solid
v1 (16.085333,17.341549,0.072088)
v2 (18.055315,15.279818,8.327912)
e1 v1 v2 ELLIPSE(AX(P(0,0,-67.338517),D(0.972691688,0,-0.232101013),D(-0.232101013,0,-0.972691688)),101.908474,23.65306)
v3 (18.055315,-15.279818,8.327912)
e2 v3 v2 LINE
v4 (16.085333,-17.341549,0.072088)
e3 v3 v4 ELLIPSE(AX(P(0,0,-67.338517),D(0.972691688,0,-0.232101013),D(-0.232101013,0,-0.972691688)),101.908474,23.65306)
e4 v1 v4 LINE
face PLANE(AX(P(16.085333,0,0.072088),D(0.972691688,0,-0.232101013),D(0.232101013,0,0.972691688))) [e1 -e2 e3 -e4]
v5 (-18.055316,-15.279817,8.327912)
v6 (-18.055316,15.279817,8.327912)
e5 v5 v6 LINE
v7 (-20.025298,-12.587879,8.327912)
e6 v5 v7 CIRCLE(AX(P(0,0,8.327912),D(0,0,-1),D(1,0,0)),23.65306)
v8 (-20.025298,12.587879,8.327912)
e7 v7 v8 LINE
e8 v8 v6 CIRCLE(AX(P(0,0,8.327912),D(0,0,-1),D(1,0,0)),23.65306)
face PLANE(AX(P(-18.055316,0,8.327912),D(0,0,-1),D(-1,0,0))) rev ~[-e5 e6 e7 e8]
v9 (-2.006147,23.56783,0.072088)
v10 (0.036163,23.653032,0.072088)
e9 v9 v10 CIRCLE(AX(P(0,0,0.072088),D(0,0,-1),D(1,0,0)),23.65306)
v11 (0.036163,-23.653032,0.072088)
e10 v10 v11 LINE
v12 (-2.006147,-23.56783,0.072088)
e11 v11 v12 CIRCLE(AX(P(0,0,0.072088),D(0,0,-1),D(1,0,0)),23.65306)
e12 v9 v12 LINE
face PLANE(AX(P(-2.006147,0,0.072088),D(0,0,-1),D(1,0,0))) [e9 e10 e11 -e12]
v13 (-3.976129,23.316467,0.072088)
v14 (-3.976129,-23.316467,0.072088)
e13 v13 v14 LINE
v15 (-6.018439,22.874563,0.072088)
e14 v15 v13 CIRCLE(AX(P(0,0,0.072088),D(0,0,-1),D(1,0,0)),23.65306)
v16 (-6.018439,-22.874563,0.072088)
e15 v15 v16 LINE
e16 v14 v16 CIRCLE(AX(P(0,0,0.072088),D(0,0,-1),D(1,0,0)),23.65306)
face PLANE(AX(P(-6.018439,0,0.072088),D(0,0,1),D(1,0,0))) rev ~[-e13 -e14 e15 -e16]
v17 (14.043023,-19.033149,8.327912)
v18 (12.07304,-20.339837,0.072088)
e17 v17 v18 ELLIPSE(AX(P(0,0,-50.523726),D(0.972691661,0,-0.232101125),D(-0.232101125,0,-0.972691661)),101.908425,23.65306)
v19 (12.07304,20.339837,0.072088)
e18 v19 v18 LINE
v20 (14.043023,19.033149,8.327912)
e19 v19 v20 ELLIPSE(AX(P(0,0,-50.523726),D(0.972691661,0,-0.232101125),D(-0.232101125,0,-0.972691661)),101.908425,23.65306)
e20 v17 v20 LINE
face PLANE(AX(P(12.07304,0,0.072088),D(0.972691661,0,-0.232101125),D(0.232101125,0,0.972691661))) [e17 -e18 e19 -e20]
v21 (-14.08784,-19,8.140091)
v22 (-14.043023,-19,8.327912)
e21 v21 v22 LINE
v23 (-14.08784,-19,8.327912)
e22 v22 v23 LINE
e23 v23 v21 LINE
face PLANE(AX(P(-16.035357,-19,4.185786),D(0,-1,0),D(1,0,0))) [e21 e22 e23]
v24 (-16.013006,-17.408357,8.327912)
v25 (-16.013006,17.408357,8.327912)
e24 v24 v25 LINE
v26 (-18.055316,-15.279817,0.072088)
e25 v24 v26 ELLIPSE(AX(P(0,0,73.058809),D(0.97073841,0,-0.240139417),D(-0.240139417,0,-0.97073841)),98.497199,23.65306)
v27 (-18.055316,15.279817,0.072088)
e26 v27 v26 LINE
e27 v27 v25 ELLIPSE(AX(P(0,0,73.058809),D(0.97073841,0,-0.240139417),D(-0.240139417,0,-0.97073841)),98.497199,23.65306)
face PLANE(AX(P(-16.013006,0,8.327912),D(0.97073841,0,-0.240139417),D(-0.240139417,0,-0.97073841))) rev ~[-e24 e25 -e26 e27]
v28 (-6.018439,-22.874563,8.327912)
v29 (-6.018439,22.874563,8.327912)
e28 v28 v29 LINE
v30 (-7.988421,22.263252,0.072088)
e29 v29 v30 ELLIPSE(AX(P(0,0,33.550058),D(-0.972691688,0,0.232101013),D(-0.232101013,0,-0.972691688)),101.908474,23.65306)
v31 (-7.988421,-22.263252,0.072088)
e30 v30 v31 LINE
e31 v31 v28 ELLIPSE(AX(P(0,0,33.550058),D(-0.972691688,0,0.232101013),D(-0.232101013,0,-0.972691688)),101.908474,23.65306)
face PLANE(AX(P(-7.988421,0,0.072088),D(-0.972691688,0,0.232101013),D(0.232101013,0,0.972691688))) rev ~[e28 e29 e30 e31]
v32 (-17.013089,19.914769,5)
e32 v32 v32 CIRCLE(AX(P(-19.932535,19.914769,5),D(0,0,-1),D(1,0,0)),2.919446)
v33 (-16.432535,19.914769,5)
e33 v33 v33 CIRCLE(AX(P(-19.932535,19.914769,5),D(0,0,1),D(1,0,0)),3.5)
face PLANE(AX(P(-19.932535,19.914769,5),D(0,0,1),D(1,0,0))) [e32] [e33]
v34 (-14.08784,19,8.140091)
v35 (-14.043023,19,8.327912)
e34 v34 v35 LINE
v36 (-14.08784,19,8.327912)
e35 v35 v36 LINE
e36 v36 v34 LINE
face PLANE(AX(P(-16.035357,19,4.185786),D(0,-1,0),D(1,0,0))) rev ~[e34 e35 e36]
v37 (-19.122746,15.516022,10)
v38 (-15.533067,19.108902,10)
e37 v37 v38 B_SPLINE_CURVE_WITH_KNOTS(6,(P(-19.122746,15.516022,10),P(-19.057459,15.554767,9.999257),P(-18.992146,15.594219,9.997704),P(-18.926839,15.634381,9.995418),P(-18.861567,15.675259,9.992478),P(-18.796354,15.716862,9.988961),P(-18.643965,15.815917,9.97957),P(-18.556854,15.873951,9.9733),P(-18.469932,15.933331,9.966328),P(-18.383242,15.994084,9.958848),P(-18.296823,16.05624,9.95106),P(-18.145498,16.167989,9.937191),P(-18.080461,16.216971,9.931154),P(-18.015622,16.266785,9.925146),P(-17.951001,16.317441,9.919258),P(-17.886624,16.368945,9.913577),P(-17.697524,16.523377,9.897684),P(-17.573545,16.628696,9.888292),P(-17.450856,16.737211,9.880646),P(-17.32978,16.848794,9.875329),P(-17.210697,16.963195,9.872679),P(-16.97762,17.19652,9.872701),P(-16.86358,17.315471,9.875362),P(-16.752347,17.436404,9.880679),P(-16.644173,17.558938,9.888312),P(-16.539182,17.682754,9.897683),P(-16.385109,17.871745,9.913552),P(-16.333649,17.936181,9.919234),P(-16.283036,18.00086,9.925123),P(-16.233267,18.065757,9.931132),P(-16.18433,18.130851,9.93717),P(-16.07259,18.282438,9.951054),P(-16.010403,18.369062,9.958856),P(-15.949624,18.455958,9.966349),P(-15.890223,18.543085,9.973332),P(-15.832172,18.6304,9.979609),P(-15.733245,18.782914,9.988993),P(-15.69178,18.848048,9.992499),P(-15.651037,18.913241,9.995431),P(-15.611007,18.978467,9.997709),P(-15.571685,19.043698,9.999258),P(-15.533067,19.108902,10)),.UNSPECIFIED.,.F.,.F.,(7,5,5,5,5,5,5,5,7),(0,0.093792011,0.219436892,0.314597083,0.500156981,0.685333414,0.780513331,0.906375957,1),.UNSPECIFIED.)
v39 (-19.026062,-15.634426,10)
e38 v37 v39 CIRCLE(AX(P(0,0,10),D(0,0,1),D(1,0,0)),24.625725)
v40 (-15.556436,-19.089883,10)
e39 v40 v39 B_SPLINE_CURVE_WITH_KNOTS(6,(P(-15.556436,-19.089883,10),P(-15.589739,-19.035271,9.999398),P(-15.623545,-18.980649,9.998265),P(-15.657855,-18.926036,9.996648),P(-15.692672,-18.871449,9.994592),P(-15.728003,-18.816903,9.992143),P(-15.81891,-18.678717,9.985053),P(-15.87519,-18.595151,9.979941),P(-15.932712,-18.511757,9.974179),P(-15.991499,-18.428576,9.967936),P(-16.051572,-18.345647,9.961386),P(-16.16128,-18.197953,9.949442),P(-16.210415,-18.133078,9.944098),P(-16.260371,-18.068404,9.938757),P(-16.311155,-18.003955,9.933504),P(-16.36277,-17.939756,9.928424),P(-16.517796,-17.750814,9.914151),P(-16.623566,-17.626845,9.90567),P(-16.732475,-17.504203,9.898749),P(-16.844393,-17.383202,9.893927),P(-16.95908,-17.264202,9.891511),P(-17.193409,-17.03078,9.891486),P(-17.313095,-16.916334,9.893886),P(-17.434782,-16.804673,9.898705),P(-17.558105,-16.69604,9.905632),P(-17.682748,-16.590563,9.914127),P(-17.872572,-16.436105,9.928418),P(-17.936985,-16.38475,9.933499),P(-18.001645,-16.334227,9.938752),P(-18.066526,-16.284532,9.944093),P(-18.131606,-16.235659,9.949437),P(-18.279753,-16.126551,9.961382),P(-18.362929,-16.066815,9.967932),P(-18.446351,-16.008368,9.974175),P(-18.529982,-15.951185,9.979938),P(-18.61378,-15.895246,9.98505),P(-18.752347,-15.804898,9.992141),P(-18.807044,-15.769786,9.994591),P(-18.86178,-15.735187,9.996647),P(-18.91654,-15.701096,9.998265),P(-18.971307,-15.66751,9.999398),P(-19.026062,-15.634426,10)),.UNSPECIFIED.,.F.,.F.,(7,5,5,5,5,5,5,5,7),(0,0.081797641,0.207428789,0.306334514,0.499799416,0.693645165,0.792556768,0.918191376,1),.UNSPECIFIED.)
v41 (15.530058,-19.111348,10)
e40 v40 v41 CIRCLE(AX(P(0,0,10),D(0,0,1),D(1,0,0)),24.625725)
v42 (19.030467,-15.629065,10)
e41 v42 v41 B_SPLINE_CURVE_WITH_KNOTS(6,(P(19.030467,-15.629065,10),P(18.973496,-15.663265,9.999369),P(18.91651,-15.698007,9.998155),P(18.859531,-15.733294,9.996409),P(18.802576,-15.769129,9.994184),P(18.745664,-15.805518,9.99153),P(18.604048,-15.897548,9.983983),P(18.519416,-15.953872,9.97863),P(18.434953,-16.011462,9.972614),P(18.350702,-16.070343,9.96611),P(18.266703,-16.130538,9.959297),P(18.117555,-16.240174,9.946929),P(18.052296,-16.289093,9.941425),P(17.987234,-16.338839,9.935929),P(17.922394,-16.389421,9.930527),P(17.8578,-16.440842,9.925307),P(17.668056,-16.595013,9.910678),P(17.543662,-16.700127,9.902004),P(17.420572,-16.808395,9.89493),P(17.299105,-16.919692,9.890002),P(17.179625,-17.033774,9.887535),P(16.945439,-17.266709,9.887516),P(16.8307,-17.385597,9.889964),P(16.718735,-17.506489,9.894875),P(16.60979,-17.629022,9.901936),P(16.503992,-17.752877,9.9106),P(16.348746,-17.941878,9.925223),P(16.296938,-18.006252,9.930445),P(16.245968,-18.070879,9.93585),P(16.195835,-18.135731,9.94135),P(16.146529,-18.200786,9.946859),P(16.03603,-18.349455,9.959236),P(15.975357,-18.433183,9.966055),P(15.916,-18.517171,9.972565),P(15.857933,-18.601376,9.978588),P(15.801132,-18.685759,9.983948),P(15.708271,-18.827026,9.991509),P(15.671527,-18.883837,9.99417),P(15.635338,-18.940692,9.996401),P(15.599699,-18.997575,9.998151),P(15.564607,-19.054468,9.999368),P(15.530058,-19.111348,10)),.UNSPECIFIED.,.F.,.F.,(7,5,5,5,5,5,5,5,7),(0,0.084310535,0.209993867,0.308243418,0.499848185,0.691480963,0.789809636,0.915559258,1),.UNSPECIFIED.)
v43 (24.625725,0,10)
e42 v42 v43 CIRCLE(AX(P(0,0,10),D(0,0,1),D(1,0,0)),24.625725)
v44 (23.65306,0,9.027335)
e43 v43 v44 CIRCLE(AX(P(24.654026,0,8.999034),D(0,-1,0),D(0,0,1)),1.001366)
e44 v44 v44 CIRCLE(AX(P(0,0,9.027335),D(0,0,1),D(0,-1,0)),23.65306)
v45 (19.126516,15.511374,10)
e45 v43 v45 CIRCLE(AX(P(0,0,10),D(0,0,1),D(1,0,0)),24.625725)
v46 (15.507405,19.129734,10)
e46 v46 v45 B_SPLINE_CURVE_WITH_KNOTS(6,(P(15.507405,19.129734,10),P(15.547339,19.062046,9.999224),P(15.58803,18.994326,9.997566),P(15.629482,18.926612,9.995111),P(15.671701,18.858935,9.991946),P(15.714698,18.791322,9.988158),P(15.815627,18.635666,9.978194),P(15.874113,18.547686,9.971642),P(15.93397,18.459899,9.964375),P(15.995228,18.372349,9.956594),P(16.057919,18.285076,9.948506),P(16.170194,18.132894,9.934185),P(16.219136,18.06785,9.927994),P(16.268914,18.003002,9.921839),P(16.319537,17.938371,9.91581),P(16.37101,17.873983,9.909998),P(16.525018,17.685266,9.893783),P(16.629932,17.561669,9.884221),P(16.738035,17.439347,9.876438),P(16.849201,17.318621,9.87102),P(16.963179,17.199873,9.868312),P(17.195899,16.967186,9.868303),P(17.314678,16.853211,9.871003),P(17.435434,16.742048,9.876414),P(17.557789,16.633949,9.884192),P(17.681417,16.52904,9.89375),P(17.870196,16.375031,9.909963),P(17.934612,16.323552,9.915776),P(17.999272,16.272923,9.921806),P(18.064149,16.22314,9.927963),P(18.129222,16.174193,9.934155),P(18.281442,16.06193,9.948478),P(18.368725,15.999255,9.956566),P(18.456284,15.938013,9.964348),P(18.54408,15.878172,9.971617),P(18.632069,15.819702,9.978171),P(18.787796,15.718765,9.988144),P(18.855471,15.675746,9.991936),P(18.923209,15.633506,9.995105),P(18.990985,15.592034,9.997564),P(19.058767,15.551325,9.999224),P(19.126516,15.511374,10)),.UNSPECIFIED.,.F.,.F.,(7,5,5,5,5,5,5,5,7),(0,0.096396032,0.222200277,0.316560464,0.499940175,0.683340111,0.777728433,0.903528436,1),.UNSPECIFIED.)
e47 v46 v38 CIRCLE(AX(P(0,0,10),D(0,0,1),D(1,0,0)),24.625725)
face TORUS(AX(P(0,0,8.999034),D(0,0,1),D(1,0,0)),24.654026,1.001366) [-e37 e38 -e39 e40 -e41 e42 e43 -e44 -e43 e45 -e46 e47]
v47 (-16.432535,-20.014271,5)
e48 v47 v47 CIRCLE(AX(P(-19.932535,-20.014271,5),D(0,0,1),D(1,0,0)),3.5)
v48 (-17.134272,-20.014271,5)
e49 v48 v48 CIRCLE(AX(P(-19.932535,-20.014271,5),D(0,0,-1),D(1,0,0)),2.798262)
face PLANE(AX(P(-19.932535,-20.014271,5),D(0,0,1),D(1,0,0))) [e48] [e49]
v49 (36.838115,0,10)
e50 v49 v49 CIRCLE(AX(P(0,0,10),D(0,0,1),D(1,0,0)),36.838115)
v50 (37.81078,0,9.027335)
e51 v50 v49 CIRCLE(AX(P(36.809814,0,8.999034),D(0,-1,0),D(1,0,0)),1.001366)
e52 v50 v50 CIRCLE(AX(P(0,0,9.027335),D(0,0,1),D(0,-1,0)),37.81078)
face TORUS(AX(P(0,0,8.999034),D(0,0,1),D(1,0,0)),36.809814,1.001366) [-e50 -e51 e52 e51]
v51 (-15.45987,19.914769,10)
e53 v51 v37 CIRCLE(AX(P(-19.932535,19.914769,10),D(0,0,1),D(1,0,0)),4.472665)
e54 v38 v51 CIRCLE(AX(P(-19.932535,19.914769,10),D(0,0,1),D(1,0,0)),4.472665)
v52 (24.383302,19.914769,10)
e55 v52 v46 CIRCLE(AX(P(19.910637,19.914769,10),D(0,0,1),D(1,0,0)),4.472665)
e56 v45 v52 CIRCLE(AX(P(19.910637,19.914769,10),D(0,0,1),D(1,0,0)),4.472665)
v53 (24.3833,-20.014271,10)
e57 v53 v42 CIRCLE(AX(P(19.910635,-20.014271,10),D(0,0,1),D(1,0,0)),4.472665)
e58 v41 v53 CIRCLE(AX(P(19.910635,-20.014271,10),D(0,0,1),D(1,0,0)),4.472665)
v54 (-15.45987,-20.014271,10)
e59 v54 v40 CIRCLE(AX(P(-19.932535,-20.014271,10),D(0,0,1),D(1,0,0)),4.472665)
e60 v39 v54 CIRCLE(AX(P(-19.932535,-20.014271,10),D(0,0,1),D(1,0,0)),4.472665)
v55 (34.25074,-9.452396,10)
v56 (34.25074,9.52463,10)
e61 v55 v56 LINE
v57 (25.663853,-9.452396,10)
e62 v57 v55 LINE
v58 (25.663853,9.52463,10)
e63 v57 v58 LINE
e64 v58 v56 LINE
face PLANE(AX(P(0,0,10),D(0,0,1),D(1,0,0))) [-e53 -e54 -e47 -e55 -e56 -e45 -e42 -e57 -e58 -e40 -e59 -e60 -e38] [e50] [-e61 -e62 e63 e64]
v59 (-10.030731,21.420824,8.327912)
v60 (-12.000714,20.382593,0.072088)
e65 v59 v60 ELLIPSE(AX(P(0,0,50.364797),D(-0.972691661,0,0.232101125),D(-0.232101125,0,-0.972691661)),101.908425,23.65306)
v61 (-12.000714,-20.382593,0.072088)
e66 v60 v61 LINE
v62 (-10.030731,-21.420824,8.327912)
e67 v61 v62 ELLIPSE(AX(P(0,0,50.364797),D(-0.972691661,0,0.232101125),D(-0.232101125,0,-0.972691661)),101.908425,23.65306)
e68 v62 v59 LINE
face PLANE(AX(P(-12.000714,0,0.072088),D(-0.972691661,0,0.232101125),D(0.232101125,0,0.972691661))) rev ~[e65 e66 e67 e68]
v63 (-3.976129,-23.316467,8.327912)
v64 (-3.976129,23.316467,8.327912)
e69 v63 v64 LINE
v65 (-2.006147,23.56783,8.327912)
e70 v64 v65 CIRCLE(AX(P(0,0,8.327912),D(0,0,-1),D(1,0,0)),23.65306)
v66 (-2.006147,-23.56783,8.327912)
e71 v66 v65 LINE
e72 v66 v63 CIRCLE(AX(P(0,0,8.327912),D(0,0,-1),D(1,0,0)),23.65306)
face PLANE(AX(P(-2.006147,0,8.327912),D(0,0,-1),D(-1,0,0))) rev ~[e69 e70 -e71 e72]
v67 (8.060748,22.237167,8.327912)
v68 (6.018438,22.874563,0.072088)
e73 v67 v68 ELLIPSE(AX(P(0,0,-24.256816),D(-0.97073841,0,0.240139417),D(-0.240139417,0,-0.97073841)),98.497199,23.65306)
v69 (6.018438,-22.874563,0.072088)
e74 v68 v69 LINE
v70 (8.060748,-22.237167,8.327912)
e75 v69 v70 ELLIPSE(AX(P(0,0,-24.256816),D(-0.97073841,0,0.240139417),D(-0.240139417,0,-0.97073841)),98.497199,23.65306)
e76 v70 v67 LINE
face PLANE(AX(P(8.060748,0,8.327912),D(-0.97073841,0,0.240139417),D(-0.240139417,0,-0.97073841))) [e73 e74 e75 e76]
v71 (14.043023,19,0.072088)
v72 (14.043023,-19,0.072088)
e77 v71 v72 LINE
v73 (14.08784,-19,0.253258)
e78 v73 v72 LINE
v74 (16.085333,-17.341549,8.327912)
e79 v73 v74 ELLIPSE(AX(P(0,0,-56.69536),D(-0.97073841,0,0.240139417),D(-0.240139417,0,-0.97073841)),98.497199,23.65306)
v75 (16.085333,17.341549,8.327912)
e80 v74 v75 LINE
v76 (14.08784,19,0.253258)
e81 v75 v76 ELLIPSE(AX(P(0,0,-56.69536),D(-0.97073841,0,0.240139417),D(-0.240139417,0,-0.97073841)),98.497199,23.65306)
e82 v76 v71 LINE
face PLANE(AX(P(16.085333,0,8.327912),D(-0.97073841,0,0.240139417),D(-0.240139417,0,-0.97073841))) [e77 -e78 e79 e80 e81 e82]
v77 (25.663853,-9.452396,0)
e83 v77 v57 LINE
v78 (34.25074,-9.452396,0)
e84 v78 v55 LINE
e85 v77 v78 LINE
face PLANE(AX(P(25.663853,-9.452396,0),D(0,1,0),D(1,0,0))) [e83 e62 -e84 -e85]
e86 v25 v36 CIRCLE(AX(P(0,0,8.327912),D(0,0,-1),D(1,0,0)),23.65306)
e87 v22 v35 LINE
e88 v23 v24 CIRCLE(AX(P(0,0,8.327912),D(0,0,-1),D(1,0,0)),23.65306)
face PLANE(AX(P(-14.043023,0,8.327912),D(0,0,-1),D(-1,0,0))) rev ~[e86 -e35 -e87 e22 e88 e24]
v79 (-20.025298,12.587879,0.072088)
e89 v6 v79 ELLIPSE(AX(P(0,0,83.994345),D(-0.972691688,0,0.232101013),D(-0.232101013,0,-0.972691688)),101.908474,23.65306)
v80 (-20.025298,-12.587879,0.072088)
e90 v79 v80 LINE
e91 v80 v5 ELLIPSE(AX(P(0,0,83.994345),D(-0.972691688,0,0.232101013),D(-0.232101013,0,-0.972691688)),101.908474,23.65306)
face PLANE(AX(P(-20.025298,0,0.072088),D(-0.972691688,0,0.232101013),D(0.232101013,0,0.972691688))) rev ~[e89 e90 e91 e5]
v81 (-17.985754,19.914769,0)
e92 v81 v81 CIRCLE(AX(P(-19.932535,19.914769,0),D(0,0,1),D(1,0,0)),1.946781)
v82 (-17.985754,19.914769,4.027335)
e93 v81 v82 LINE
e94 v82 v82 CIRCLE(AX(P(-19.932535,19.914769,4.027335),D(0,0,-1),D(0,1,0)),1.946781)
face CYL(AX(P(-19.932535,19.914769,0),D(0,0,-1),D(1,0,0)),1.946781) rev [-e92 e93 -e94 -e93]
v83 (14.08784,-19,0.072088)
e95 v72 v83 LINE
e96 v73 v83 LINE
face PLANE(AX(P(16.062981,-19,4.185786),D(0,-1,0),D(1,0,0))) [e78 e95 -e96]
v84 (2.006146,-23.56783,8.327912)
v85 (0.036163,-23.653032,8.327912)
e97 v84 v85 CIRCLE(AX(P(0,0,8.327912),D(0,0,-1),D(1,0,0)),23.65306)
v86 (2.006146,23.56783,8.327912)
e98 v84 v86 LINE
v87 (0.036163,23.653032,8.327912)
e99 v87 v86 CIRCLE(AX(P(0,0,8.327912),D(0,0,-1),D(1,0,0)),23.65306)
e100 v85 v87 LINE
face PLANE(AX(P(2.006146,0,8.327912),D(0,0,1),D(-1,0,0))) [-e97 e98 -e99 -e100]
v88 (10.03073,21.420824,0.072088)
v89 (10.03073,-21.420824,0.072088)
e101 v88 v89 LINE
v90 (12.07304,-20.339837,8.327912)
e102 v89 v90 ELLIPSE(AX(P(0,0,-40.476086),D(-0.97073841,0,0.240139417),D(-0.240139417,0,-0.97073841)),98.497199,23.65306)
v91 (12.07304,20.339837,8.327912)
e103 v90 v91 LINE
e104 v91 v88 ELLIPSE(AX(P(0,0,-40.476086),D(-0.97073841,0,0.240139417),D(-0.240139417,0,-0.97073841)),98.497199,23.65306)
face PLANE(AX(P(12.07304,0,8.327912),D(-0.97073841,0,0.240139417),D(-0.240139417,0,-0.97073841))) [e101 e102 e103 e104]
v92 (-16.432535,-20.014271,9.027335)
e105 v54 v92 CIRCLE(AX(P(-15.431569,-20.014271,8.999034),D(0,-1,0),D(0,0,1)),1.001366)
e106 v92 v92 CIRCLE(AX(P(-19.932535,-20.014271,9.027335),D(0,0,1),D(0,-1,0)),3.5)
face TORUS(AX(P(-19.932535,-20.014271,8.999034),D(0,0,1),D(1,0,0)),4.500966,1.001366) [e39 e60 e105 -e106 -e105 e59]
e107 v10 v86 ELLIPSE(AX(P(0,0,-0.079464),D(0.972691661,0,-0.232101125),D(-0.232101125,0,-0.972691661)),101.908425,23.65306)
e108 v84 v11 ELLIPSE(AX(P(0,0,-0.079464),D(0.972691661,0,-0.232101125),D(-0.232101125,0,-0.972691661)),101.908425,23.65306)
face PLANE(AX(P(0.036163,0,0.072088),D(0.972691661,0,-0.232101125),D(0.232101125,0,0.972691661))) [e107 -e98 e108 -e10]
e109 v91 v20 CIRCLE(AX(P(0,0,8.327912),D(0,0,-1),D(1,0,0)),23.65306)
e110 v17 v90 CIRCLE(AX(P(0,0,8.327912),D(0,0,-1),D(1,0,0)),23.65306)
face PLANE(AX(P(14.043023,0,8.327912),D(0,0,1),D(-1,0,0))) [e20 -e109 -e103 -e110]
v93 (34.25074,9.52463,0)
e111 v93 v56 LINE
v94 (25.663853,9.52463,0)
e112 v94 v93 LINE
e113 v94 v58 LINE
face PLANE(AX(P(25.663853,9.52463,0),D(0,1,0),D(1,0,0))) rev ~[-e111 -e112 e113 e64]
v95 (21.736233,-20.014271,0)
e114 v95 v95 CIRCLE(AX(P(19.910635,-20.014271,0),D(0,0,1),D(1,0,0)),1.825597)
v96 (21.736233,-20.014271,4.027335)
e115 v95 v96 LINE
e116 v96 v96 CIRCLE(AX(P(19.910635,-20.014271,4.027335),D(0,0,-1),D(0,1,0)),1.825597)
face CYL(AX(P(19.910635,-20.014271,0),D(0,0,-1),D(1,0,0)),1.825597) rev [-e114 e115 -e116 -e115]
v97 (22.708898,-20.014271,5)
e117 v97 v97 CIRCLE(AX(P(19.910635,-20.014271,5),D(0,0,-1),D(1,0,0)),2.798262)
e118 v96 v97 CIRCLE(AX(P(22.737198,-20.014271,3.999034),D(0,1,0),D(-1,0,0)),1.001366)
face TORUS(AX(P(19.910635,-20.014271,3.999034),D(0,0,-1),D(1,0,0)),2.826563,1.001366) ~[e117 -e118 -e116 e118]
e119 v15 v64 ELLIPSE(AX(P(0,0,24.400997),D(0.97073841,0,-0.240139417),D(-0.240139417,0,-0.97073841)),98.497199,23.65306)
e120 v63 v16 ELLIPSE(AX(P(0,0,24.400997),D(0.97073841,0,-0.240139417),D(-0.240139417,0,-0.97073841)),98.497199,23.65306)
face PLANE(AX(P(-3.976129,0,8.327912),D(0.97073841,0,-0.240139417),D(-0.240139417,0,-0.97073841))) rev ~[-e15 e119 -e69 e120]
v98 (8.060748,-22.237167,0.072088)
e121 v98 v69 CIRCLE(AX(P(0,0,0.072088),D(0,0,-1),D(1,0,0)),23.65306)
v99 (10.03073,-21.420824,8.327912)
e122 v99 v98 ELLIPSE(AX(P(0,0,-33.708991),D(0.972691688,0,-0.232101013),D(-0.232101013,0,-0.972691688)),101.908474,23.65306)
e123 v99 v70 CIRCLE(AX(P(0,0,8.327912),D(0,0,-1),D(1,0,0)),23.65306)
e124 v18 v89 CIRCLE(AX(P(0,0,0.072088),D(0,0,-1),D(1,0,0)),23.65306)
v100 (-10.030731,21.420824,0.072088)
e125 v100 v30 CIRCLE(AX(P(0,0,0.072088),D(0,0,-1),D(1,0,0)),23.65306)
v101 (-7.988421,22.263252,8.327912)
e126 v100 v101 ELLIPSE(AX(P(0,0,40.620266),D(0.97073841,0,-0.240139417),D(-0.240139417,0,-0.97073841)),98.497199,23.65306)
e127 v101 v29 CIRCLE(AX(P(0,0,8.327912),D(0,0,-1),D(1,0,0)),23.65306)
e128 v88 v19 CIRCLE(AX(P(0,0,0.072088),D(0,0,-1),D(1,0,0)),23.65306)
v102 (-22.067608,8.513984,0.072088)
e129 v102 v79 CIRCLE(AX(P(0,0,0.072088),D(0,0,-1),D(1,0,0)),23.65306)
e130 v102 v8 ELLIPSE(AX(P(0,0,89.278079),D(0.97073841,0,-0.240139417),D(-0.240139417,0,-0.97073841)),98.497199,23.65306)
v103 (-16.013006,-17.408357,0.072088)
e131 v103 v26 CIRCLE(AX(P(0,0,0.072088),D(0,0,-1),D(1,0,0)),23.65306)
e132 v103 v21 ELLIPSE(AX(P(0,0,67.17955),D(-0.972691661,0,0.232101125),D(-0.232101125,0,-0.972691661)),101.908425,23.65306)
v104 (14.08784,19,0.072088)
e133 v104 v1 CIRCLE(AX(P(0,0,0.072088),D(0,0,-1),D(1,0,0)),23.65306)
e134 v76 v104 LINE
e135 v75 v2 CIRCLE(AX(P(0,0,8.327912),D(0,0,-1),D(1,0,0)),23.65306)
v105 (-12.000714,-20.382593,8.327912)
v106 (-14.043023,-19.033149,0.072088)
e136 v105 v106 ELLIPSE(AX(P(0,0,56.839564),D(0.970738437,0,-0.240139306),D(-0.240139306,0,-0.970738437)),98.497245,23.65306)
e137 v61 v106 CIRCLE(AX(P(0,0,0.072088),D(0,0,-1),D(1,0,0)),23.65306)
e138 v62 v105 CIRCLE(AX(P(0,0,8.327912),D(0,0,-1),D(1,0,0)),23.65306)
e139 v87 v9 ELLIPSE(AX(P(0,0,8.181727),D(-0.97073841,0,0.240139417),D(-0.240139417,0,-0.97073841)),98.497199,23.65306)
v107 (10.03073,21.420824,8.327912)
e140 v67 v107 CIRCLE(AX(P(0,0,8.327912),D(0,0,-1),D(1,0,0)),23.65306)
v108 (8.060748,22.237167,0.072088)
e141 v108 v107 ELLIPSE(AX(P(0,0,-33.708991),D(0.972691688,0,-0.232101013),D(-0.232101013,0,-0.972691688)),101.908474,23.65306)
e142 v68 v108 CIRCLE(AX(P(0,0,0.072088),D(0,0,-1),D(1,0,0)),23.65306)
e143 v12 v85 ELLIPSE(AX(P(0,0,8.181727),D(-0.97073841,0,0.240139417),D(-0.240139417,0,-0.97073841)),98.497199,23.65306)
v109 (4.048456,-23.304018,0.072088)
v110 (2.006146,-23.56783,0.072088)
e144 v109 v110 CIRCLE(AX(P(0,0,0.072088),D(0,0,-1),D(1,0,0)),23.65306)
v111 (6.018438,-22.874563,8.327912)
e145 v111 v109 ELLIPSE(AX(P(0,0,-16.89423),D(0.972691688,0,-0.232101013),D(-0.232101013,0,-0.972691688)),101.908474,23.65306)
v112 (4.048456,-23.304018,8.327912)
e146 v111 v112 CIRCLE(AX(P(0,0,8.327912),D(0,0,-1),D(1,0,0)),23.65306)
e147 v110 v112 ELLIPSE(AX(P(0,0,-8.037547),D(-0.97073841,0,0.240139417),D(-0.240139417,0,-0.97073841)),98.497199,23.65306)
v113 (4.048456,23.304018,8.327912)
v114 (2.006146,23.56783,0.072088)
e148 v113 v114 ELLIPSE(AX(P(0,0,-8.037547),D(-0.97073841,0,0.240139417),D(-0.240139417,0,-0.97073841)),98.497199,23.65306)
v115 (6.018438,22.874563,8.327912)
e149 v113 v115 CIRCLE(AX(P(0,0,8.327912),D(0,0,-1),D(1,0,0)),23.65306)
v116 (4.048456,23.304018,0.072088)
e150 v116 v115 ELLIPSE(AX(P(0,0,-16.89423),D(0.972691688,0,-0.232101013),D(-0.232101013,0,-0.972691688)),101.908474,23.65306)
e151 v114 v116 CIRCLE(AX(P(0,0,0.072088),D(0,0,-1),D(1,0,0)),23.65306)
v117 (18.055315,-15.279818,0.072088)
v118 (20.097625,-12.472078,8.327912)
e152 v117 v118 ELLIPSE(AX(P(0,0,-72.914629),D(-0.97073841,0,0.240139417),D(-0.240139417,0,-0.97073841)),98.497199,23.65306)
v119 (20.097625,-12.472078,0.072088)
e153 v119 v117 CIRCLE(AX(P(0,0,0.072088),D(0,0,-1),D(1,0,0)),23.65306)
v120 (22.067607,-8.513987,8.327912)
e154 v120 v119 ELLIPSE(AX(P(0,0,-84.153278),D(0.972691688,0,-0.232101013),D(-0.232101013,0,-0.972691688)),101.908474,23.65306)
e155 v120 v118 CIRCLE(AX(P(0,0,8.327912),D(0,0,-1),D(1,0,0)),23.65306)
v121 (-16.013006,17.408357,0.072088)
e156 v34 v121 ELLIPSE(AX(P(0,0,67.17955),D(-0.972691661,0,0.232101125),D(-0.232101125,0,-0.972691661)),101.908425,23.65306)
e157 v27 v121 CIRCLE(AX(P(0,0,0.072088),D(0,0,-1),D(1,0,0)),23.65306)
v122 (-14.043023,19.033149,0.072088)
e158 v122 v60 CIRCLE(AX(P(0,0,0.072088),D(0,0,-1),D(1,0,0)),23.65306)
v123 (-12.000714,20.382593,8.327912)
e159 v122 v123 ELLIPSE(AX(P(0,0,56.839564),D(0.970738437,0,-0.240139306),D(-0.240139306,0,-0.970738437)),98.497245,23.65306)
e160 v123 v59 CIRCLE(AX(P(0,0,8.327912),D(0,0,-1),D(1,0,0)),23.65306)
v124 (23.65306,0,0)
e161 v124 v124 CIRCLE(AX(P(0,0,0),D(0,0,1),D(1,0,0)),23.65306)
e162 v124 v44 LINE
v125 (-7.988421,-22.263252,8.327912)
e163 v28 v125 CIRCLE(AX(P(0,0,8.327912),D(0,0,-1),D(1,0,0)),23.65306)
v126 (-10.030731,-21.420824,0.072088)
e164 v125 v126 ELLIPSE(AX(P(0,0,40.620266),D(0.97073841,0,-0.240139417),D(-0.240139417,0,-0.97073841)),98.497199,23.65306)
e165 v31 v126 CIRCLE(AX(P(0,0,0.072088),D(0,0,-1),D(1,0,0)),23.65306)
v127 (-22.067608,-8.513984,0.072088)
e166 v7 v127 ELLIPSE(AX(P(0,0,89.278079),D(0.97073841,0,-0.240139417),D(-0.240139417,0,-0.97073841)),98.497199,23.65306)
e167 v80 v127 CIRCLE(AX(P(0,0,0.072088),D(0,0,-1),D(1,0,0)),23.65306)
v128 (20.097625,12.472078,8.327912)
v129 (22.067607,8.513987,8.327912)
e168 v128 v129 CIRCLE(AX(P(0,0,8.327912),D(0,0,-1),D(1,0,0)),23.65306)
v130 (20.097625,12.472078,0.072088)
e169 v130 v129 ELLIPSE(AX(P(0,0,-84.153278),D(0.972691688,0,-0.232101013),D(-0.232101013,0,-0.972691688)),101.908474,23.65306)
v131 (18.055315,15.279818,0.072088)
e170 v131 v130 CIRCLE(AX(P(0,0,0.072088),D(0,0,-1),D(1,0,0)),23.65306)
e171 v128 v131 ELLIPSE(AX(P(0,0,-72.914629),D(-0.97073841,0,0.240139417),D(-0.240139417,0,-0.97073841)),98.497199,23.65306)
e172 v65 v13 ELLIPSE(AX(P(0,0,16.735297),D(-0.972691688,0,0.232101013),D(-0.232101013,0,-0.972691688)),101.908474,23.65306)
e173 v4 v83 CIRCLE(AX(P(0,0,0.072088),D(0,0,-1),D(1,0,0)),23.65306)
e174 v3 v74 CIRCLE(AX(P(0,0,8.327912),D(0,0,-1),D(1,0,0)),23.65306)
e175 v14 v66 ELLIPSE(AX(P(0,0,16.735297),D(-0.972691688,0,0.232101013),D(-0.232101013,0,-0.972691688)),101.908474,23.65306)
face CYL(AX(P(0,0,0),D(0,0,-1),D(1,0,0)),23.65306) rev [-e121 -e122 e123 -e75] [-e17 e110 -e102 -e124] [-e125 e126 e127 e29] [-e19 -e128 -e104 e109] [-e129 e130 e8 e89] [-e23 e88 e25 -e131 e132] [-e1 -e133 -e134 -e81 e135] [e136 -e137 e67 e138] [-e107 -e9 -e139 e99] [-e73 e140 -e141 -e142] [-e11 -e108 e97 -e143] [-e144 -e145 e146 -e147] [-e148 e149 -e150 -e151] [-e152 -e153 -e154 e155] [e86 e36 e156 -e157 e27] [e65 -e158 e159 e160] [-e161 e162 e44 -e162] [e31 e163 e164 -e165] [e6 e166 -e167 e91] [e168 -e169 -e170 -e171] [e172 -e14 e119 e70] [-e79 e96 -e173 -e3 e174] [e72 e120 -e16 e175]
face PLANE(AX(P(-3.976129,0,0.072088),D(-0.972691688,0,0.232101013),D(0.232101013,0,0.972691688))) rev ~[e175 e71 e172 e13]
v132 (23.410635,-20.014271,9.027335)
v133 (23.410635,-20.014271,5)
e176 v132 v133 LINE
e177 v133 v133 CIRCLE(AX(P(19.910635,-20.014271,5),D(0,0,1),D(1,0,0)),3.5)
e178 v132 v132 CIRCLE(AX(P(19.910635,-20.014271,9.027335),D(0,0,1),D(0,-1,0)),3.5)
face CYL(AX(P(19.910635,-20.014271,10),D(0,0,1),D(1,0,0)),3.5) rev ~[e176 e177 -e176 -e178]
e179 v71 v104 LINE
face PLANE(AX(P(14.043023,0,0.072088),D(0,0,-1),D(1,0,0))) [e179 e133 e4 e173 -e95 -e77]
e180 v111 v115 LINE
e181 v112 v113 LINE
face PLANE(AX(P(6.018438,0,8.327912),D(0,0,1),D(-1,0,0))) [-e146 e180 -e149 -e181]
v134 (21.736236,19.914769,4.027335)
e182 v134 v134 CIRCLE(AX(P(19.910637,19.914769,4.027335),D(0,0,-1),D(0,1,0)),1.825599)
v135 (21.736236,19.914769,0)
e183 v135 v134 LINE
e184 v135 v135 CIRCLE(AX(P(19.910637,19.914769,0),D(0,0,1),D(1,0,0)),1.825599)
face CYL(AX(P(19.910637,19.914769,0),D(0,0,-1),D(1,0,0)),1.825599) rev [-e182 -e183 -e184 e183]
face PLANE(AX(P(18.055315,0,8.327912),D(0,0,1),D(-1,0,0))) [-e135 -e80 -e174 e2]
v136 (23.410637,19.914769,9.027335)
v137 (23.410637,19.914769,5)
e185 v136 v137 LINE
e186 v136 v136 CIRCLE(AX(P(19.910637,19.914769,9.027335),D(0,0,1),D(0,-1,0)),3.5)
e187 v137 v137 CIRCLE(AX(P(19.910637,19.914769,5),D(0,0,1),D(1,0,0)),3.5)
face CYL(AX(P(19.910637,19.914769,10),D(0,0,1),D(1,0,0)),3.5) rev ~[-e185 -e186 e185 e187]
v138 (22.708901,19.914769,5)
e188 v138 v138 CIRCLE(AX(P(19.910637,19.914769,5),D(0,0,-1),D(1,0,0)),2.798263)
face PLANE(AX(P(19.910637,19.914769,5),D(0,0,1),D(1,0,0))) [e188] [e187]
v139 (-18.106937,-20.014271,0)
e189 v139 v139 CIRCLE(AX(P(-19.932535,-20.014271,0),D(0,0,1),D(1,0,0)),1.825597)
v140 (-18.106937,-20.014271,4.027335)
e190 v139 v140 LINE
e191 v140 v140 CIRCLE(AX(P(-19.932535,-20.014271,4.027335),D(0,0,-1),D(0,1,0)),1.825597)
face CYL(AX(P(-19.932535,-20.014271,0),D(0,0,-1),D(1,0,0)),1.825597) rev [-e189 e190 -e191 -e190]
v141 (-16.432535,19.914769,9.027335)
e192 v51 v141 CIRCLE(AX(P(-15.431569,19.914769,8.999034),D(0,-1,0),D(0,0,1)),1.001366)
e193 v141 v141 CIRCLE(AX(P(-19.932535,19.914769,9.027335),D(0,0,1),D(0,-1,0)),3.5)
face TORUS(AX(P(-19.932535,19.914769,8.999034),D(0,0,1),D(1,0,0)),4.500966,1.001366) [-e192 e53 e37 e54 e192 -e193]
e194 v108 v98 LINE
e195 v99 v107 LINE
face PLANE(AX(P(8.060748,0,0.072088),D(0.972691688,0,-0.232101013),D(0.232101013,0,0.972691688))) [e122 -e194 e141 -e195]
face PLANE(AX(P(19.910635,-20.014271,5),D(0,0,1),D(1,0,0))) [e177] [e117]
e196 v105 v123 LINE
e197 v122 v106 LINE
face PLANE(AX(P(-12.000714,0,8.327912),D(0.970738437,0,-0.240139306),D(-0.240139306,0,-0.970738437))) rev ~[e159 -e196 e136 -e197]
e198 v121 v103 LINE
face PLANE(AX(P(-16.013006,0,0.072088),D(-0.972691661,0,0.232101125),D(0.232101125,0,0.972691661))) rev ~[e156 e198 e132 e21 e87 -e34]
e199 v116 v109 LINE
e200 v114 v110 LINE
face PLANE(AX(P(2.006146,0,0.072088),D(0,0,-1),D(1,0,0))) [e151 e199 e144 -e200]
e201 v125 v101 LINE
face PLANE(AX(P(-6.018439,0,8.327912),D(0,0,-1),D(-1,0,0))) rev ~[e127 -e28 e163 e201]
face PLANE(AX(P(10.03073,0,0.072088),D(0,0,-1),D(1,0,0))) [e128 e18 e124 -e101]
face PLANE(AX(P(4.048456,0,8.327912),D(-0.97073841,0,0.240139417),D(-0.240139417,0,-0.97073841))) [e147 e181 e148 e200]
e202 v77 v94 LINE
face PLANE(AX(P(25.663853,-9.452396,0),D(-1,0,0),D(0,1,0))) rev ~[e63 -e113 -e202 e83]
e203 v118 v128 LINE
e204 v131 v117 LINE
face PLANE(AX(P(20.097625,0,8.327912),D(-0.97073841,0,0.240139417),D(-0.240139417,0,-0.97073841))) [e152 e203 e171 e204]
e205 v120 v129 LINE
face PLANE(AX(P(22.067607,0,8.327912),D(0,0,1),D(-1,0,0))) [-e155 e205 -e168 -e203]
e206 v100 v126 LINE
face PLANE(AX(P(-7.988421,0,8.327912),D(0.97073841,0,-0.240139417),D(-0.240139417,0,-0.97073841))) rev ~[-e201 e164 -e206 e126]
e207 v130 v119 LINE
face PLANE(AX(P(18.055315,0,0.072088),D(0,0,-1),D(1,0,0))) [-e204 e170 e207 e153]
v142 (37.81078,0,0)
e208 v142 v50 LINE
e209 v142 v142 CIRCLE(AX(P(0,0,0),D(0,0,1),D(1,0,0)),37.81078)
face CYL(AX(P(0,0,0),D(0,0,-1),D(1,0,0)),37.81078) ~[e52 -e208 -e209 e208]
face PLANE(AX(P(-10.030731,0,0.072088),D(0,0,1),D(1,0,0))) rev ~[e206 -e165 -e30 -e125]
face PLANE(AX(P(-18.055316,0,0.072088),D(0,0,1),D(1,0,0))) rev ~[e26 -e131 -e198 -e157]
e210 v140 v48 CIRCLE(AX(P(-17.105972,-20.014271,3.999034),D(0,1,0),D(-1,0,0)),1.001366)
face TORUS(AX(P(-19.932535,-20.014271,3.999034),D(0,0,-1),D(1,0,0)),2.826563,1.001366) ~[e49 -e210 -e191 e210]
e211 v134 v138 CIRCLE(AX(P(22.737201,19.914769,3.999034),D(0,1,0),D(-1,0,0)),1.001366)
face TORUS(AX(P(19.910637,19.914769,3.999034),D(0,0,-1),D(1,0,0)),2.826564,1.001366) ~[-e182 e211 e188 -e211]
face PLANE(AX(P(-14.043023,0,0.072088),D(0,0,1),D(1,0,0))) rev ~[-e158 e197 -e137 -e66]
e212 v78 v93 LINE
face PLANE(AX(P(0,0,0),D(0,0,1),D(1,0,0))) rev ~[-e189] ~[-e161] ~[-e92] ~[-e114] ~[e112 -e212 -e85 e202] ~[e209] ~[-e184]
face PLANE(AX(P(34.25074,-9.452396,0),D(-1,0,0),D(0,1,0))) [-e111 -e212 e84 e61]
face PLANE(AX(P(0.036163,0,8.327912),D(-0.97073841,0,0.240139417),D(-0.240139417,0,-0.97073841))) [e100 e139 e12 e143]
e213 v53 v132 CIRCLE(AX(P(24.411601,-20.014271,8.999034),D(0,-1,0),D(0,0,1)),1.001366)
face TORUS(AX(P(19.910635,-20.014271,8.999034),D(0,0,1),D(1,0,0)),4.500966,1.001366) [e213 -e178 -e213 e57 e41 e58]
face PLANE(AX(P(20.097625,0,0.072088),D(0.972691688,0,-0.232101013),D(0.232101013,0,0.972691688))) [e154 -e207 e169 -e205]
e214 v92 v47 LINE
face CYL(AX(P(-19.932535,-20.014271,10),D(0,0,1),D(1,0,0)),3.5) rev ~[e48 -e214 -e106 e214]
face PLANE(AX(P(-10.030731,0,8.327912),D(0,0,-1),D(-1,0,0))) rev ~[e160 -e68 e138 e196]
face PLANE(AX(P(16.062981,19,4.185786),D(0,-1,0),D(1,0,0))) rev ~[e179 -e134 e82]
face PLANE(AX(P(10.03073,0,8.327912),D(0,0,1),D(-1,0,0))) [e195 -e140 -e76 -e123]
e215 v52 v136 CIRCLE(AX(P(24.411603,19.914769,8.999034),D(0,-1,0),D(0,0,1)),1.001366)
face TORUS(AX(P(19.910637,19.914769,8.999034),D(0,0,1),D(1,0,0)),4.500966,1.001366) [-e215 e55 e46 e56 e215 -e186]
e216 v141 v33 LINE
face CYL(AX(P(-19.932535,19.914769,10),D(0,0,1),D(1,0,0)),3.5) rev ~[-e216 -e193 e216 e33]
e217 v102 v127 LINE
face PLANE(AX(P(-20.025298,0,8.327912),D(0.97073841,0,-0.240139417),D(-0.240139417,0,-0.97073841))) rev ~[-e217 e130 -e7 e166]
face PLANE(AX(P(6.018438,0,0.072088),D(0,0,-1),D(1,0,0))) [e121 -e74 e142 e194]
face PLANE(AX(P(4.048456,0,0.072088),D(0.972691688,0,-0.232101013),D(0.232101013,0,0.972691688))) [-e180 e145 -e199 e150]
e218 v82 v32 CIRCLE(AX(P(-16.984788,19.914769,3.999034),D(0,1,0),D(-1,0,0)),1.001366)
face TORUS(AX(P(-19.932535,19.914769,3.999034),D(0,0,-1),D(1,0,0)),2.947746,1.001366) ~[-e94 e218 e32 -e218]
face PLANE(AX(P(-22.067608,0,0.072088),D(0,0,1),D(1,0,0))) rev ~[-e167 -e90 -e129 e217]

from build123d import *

# Parameters (mm, degrees)
F0_R      = 37.8107797269
F0_R_2    = 1.8255972752
F0_R_3    = 1.9467806804
F0_R_4    = 23.653060021
F0_W      = 8.5868872702
F0_H      = 18.9770264551
F0_R_5    = 1.8255985018
F1_DEPTH  = 10
F4_DEPTH  = 15.5
F5_DEPTH  = 19
F6_DEPTH  = 22
F7_DEPTH  = 24
F8_DEPTH  = 27.5
F9_DEPTH  = 27.5
F2_R      = 3.5
F2_R_2    = 1.8255985018
F2_R_3    = 1.8255972752
F2_R_4    = 1.9467806804
F10_DEPTH = 5


# Not quite as in the source:
# - a fillet or chamfer that OpenCascade refuses, or shapes differently, is made with other operations: its cross-section is extruded or revolved along the edge and cut away or added


with BuildPart() as f1:
    # F0 (on Top) → F1 (new body)
    with BuildSketch(Plane.XY):
        Circle(F0_R)
        with Locations((-19.9325345457, -20.0142711401)):
            Circle(F0_R_2, mode=Mode.SUBTRACT)
        with Locations((19.9106354266, -20.0142711401)):
            Circle(F0_R_2, mode=Mode.SUBTRACT)
        with Locations((-19.9325345457, 19.9147686362)):
            Circle(F0_R_3, mode=Mode.SUBTRACT)
        Circle(F0_R_4, mode=Mode.SUBTRACT)
        with Locations((29.9572963268, 0.0361171551)):
            Rectangle(F0_W, F0_H, mode=Mode.SUBTRACT)
        with Locations((19.9106372893, 19.9147686362)):
            Circle(F0_R_5, mode=Mode.SUBTRACT)
    extrude(amount=F1_DEPTH)

    # F3 (on Front) → F4 (join, symmetric)
    with BuildSketch(Plane.XZ):
        Polygon((-20.025298, 8.327912), (-22.067608, 0.072088), (-20.025298, 0.072088), (-18.055316, 8.327912), align=None)
        Polygon((20.097625, 8.327912), (18.055315, 0.072088), (20.097625, 0.072088), (22.067607, 8.327912), align=None)
    extrude(amount=F4_DEPTH, both=True)

    # F3 (on Front) → F5 (join, symmetric)
    with BuildSketch(Plane.XZ):
        Polygon((-16.013006, 8.327912), (-18.055316, 0.072088), (-16.013006, 0.072088), (-14.043023, 8.327912), align=None)
        Polygon((16.085333, 8.327912), (14.043023, 0.072088), (16.085333, 0.072088), (18.055315, 8.327912), align=None)
    extrude(amount=F5_DEPTH, both=True)

    # F3 (on Front) → F6 (join, symmetric)
    with BuildSketch(Plane.XZ):
        Polygon((-12.000714, 8.327912), (-14.043023, 0.072088), (-12.000714, 0.072088), (-10.030731, 8.327912), align=None)
        Polygon((12.07304, 8.327912), (10.03073, 0.072088), (12.07304, 0.072088), (14.043023, 8.327912), align=None)
    extrude(amount=F6_DEPTH, both=True)

    # F3 (on Front) → F7 (join, symmetric)
    with BuildSketch(Plane.XZ):
        Polygon((-7.988421, 8.327912), (-10.030731, 0.072088), (-7.988421, 0.072088), (-6.018439, 8.327912), align=None)
        Polygon((8.060748, 8.327912), (6.018438, 0.072088), (8.060748, 0.072088), (10.03073, 8.327912), align=None)
    extrude(amount=F7_DEPTH, both=True)

    # F3 (on Front) → F8 (join, symmetric)
    with BuildSketch(Plane.XZ):
        Polygon((-3.976129, 8.327912), (-6.018439, 0.072088), (-3.976129, 0.072088), (-2.006147, 8.327912), align=None)
        Polygon((4.048456, 8.327912), (2.006146, 0.072088), (4.048456, 0.072088), (6.018438, 8.327912), align=None)
    extrude(amount=F8_DEPTH, both=True)

    # F3 (on Front) → F9 (join, symmetric)
    with BuildSketch(Plane.XZ):
        Polygon((0.036163, 8.327912), (-2.006147, 0.072088), (0.036163, 0.072088), (2.006146, 8.327912), align=None)
    extrude(amount=F9_DEPTH, both=True)

    # F2 (on face) → F10 (cut)
    with BuildSketch(Plane.XY.offset(10)):
        with Locations((19.9106372893, 19.9147686362)):
            Circle(F2_R)
        with Locations((19.9106372893, 19.9147686362)):
            Circle(F2_R_2, mode=Mode.SUBTRACT)
        with Locations((-19.9325345457, -20.0142711401)):
            Circle(F2_R)
        with Locations((-19.9325345457, -20.0142711401)):
            Circle(F2_R_3, mode=Mode.SUBTRACT)
        with Locations((19.9106354266, -20.0142711401)):
            Circle(F2_R)
        with Locations((19.9106354266, -20.0142711401)):
            Circle(F2_R_3, mode=Mode.SUBTRACT)
        with Locations((-19.9325345457, 19.9147686362)):
            Circle(F2_R)
        with Locations((-19.9325345457, 19.9147686362)):
            Circle(F2_R_4, mode=Mode.SUBTRACT)
    extrude(amount=-F10_DEPTH, mode=Mode.SUBTRACT)

    # F11: fillet of radius 1 on 10 edges, made by hand

    # F11_s1 → F11_t2 (revolve, cut)
    with BuildSketch(Plane.XZ):
        with BuildLine():
            ThreePointArc((24.6540257064, 10.0004), (23.9459532398, 9.7071067812), (23.652660021, 8.9990343146))
            Line((23.652660021, 8.9990343146), (23.5525234525, 8.9990343146))
            ThreePointArc((23.5525234525, 8.9990343146), (23.5529234525, 9.4995171573), (23.5529234525, 10))
            Line((23.5529234525, 10), (23.653060021, 10.1001365685))
            ThreePointArc((23.653060021, 10.1001365685), (24.1535428637, 10.1001365685), (24.6540257064, 10.1005365685))
            Line((24.6540257064, 10.1005365685), (24.6540257064, 10.0004))
        make_face()
    revolve(axis=Axis((0, 0, 10), (0, 0, 1)), mode=Mode.SUBTRACT)

    # F11_s3 → F11_t4 (revolve, cut)
    with BuildSketch(Plane.XZ):
        with BuildLine():
            ThreePointArc((37.8111797269, 8.9990343146), (37.5178865081, 9.7071067812), (36.8098140415, 10.0004))
            Line((36.8098140415, 10.0004), (36.8098140415, 10.1005365685))
            ThreePointArc((36.8098140415, 10.1005365685), (37.3102968842, 10.1001365685), (37.8107797269, 10.1001365685))
            Line((37.8107797269, 10.1001365685), (37.9109162955, 10))
            ThreePointArc((37.9109162955, 10), (37.9109162955, 9.4995171573), (37.9113162955, 8.9990343146))
            Line((37.9113162955, 8.9990343146), (37.8111797269, 8.9990343146))
        make_face()
    revolve(axis=Axis((0, 0, 10), (0, 0, 1)), mode=Mode.SUBTRACT)

    # F11_s5 → F11_t6 (revolve, cut)
    with BuildSketch(Plane.XZ.offset(-19.9147686362)):
        with BuildLine():
            ThreePointArc((24.4116029747, 10.0004), (23.7035305081, 9.7071067812), (23.4102372893, 8.9990343146))
            Line((23.4102372893, 8.9990343146), (23.3101007207, 8.9990343146))
            ThreePointArc((23.3101007207, 8.9990343146), (23.3105007207, 9.4995171573), (23.3105007207, 10))
            Line((23.3105007207, 10), (23.4106372893, 10.1001365685))
            ThreePointArc((23.4106372893, 10.1001365685), (23.911120132, 10.1001365685), (24.4116029747, 10.1005365685))
            Line((24.4116029747, 10.1005365685), (24.4116029747, 10.0004))
        make_face()
    revolve(axis=Axis((19.9106372893, 19.9147686362, 10), (0, 0, 1)), mode=Mode.SUBTRACT)

    # F11_s7 → F11_t8 (revolve, cut)
    with BuildSketch(Plane.XZ.offset(20.0142711401)):
        with BuildLine():
            ThreePointArc((24.4116011121, 10.0004), (23.7035286455, 9.7071067812), (23.4102354266, 8.9990343146))
            Line((23.4102354266, 8.9990343146), (23.3100988581, 8.9990343146))
            ThreePointArc((23.3100988581, 8.9990343146), (23.3104988581, 9.4995171573), (23.3104988581, 10))
            Line((23.3104988581, 10), (23.4106354266, 10.1001365685))
            ThreePointArc((23.4106354266, 10.1001365685), (23.9111182694, 10.1001365685), (24.4116011121, 10.1005365685))
            Line((24.4116011121, 10.1005365685), (24.4116011121, 10.0004))
        make_face()
    revolve(axis=Axis((19.9106354266, -20.0142711401, 10), (0, 0, 1)), mode=Mode.SUBTRACT)

    # F11_s9 → F11_t10 (revolve, cut)
    with BuildSketch(Plane.XZ.offset(20.0142711401)):
        with BuildLine():
            ThreePointArc((-15.4315688602, 10.0004), (-16.1396413268, 9.7071067812), (-16.4329345457, 8.9990343146))
            Line((-16.4329345457, 8.9990343146), (-16.5330711142, 8.9990343146))
            ThreePointArc((-16.5330711142, 8.9990343146), (-16.5326711142, 9.4995171573), (-16.5326711142, 10))
            Line((-16.5326711142, 10), (-16.4325345457, 10.1001365685))
            ThreePointArc((-16.4325345457, 10.1001365685), (-15.9320517029, 10.1001365685), (-15.4315688602, 10.1005365685))
            Line((-15.4315688602, 10.1005365685), (-15.4315688602, 10.0004))
        make_face()
    revolve(axis=Axis((-19.9325345457, -20.0142711401, 10), (0, 0, 1)), mode=Mode.SUBTRACT)

    # F11_s11 → F11_t12 (revolve, cut)
    with BuildSketch(Plane.XZ.offset(-19.9147686362)):
        with BuildLine():
            ThreePointArc((-15.4315688602, 10.0004), (-16.1396413268, 9.7071067812), (-16.4329345457, 8.9990343146))
            Line((-16.4329345457, 8.9990343146), (-16.5330711142, 8.9990343146))
            ThreePointArc((-16.5330711142, 8.9990343146), (-16.5326711142, 9.4995171573), (-16.5326711142, 10))
            Line((-16.5326711142, 10), (-16.4325345457, 10.1001365685))
            ThreePointArc((-16.4325345457, 10.1001365685), (-15.9320517029, 10.1001365685), (-15.4315688602, 10.1005365685))
            Line((-15.4315688602, 10.1005365685), (-15.4315688602, 10.0004))
        make_face()
    revolve(axis=Axis((-19.9325345457, 19.9147686362, 10), (0, 0, 1)), mode=Mode.SUBTRACT)

    # F11_s13 → F11_t14 (revolve, cut)
    with BuildSketch(Plane.XZ.offset(-19.9147686362)):
        with BuildLine():
            ThreePointArc((-17.9861538653, 3.9990343146), (-17.6928606464, 4.7071067812), (-16.9847881798, 5.0004))
            Line((-16.9847881798, 5.0004), (-16.9847881798, 5.1005365685))
            ThreePointArc((-16.9847881798, 5.1005365685), (-17.4852710225, 5.1001365685), (-17.9857538653, 5.1001365685))
            Line((-17.9857538653, 5.1001365685), (-18.0858904338, 5))
            ThreePointArc((-18.0858904338, 5), (-18.0858904338, 4.4995171573), (-18.0862904338, 3.9990343146))
            Line((-18.0862904338, 3.9990343146), (-17.9861538653, 3.9990343146))
        make_face()
    revolve(axis=Axis((-19.9325345457, 19.9147686362, 5), (0, 0, 1)), mode=Mode.SUBTRACT)

    # F11_s15 → F11_t16 (revolve, cut)
    with BuildSketch(Plane.XZ.offset(20.0142711401)):
        with BuildLine():
            ThreePointArc((-18.1073372705, 3.9990343146), (-17.8140440516, 4.7071067812), (-17.105971585, 5.0004))
            Line((-17.105971585, 5.0004), (-17.105971585, 5.1005365685))
            ThreePointArc((-17.105971585, 5.1005365685), (-17.6064544278, 5.1001365685), (-18.1069372705, 5.1001365685))
            Line((-18.1069372705, 5.1001365685), (-18.207073839, 5))
            ThreePointArc((-18.207073839, 5), (-18.207073839, 4.4995171573), (-18.207473839, 3.9990343146))
            Line((-18.207473839, 3.9990343146), (-18.1073372705, 3.9990343146))
        make_face()
    revolve(axis=Axis((-19.9325345457, -20.0142711401, 5), (0, 0, 1)), mode=Mode.SUBTRACT)

    # F11_s17 → F11_t18 (revolve, cut)
    with BuildSketch(Plane.XZ.offset(20.0142711401)):
        with BuildLine():
            ThreePointArc((21.7358327018, 3.9990343146), (22.0291259207, 4.7071067812), (22.7371983873, 5.0004))
            Line((22.7371983873, 5.0004), (22.7371983873, 5.1005365685))
            ThreePointArc((22.7371983873, 5.1005365685), (22.2367155446, 5.1001365685), (21.7362327018, 5.1001365685))
            Line((21.7362327018, 5.1001365685), (21.6360961333, 5))
            ThreePointArc((21.6360961333, 5), (21.6360961333, 4.4995171573), (21.6356961333, 3.9990343146))
            Line((21.6356961333, 3.9990343146), (21.7358327018, 3.9990343146))
        make_face()
    revolve(axis=Axis((19.9106354266, -20.0142711401, 5), (0, 0, 1)), mode=Mode.SUBTRACT)

    # F11_s19 → F11_t20 (revolve, cut)
    with BuildSketch(Plane.XZ.offset(-19.9147686362)):
        with BuildLine():
            ThreePointArc((21.735835791, 3.9990343146), (22.0291290099, 4.7071067812), (22.7372014765, 5.0004))
            Line((22.7372014765, 5.0004), (22.7372014765, 5.1005365685))
            ThreePointArc((22.7372014765, 5.1005365685), (22.2367186338, 5.1001365685), (21.736235791, 5.1001365685))
            Line((21.736235791, 5.1001365685), (21.6360992225, 5))
            ThreePointArc((21.6360992225, 5), (21.6360992225, 4.4995171573), (21.6356992225, 3.9990343146))
            Line((21.6356992225, 3.9990343146), (21.735835791, 3.9990343146))
        make_face()
    revolve(axis=Axis((19.9106372893, 19.9147686362, 5), (0, 0, 1)), mode=Mode.SUBTRACT)


solid = f1.part
